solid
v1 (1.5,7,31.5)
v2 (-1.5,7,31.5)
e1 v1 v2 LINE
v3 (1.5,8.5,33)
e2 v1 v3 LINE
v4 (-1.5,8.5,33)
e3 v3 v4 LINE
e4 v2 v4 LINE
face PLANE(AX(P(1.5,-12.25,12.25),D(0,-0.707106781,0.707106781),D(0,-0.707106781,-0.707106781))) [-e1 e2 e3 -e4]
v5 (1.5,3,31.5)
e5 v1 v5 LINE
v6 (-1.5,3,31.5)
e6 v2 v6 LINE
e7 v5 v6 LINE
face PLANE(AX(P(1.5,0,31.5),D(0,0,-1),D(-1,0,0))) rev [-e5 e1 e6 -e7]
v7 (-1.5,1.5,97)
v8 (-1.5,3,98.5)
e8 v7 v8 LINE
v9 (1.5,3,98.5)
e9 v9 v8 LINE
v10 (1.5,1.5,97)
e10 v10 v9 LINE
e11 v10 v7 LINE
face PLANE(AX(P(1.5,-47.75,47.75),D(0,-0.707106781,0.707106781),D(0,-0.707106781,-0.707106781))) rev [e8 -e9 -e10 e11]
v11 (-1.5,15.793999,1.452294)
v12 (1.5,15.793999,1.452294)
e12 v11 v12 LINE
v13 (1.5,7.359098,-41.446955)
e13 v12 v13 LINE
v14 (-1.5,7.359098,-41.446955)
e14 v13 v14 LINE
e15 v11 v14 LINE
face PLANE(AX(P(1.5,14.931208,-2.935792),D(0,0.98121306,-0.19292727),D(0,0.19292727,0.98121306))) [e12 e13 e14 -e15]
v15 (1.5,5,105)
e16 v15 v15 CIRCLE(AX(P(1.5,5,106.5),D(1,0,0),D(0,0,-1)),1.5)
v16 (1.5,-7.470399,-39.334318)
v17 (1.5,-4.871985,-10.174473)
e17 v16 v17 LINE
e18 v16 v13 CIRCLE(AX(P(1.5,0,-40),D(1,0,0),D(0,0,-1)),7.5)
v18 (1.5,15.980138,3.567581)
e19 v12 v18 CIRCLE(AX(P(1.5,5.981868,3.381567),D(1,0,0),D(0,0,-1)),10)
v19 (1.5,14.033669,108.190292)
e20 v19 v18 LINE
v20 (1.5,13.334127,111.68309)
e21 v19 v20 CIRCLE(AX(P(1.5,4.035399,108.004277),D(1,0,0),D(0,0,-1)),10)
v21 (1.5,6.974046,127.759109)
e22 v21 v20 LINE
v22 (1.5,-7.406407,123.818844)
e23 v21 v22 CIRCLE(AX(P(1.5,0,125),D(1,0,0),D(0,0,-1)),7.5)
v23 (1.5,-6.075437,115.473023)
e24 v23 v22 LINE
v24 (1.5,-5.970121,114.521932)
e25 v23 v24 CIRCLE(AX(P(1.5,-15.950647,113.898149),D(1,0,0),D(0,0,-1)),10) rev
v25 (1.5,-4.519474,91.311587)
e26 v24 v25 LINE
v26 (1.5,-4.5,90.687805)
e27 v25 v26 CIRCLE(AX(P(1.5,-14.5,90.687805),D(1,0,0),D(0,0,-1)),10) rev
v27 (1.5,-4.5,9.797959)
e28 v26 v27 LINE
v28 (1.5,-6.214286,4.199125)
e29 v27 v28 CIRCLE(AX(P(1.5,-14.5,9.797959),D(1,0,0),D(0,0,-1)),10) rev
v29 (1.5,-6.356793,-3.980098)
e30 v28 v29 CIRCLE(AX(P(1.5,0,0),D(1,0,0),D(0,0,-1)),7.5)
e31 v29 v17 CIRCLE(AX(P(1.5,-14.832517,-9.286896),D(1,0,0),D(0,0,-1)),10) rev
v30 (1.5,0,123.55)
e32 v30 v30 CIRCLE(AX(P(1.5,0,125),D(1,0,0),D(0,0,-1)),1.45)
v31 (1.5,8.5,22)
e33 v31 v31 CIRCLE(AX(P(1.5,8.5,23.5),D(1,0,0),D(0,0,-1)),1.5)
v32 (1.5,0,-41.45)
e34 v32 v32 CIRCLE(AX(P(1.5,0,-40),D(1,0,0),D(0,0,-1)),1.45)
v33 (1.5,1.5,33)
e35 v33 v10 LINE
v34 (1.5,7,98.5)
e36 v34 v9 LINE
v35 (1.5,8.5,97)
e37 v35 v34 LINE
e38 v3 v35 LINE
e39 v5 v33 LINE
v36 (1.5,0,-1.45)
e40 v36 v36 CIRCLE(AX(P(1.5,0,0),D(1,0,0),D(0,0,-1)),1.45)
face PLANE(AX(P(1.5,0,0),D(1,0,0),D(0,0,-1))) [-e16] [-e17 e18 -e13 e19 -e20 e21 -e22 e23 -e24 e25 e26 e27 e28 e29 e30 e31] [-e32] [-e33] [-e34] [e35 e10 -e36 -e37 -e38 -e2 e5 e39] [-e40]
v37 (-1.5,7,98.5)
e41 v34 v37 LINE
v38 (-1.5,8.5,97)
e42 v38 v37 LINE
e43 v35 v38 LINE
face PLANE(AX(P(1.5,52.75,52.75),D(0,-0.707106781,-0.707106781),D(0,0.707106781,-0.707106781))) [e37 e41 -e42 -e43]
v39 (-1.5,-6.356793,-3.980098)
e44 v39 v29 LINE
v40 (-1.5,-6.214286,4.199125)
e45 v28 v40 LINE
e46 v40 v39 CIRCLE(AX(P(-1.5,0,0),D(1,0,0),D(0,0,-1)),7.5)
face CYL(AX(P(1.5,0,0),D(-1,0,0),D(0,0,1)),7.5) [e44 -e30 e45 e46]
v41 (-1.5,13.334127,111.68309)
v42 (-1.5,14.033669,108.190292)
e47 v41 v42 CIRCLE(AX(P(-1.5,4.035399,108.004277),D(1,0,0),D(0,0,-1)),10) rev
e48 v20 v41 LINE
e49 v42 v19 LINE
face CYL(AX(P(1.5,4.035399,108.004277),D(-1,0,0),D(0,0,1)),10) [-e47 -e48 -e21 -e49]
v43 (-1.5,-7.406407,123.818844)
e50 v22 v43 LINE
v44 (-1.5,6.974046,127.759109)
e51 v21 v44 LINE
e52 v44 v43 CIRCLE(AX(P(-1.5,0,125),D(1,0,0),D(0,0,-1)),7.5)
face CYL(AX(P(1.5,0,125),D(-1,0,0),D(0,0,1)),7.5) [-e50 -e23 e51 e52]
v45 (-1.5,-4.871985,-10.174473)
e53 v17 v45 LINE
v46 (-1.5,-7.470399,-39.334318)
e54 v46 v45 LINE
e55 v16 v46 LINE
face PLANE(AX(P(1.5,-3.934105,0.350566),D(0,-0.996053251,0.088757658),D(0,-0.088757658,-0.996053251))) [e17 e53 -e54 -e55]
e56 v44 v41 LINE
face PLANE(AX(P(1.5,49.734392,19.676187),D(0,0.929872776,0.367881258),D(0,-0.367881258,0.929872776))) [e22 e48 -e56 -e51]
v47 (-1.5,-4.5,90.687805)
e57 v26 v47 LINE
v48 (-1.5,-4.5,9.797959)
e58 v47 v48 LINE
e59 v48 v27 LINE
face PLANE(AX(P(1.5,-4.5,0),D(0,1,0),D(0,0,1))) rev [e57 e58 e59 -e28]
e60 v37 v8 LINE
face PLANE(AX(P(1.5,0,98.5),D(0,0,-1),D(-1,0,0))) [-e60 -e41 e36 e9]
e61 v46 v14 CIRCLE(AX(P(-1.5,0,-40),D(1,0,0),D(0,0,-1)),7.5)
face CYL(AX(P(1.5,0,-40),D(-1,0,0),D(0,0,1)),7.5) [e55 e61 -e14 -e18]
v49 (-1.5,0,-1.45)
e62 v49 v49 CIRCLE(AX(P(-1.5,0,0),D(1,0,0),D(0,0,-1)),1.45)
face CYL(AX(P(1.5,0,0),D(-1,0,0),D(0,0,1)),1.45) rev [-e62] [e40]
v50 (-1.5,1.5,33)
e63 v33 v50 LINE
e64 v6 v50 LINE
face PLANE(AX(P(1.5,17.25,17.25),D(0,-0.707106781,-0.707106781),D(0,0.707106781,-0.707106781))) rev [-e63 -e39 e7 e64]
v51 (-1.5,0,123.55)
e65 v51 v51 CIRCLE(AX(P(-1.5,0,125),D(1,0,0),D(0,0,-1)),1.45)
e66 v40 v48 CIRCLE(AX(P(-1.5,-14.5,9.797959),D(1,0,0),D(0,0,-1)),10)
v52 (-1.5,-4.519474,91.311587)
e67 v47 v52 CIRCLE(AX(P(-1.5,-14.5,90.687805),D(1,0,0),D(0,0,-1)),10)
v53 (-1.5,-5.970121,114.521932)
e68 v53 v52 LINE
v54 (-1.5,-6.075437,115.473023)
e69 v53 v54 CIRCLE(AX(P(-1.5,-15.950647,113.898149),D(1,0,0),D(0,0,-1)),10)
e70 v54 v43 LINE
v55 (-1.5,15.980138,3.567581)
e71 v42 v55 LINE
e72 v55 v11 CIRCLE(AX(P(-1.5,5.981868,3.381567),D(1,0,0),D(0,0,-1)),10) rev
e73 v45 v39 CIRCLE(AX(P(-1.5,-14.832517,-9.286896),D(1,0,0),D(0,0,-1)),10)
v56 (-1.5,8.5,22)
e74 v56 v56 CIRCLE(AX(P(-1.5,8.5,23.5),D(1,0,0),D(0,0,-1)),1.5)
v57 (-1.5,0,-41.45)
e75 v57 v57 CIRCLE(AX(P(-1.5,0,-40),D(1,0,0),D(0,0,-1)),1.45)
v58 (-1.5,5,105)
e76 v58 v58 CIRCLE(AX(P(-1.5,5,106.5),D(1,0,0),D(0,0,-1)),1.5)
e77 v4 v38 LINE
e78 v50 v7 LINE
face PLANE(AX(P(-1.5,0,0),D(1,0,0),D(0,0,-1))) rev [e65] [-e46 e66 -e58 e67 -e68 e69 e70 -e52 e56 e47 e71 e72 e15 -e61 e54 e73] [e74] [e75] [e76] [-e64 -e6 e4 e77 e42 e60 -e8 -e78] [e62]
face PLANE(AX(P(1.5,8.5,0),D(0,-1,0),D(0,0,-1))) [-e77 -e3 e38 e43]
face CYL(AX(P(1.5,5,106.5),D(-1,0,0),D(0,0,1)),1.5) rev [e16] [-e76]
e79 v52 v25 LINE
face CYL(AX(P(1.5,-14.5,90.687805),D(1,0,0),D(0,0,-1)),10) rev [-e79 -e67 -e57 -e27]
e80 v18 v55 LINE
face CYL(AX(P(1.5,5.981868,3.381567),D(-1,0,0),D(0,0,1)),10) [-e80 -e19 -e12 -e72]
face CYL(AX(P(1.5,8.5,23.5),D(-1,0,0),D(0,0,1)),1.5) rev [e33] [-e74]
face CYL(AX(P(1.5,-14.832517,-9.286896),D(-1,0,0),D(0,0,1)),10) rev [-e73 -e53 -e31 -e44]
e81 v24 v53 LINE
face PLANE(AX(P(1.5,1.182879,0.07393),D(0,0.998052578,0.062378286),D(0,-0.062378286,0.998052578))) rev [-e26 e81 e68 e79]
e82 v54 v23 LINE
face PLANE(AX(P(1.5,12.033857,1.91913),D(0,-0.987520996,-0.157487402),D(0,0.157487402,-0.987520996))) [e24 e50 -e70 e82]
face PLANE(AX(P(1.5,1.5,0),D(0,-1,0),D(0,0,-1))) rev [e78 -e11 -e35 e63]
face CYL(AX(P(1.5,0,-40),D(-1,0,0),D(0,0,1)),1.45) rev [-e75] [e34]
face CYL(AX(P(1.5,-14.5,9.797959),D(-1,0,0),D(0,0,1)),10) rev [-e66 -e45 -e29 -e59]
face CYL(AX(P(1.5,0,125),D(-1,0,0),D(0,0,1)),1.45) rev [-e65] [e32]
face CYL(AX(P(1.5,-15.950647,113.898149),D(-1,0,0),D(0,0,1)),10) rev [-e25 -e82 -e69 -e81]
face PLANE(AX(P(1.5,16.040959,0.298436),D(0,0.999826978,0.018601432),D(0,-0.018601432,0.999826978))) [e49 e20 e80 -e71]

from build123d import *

# Parameters (mm, degrees)
SKETCH1_R           = 1.45
SKETCH1_R_2         = 1.5
BOSS_EXTRUDE1_DEPTH = 1.5
FILLET1_R           = 10


with BuildPart() as part:
    # Sketch1 → Boss-Extrude1 (new, symmetric)
    with BuildSketch(Plane(origin=(0, 0, 0), x_dir=(0, 0, -1), z_dir=(1, 0, 0))):
        with BuildLine():
            Line((-110, 14), (-127.759109434, 6.974045822))
            ThreePointArc((-127.759109434, 6.974045822), (-132.233383985, -1.981957648), (-123.818844483, -7.406407472))
            Line((-123.818844483, -7.406407472), (-115, -6))
            Line((-115, -6), (-91, -4.5))
            Line((-91, -4.5), (-6, -4.5))
            ThreePointArc((-6, -4.5), (0, -7.5), (6, -4.5))
            Line((6, -4.5), (39.334317565, -7.47039938))
            ThreePointArc((39.334317565, -7.47039938), (47.425031601, -1.057783404), (41.446954522, 7.359097948))
            Line((41.446954522, 7.359097948), (-2.5, 16))
            Line((-2.5, 16), (-110, 14))
        make_face()
        with Locations((-125, 0)):
            Circle(SKETCH1_R, mode=Mode.SUBTRACT)
        Circle(SKETCH1_R, mode=Mode.SUBTRACT)
        with Locations((-106.5, 5)):
            Circle(SKETCH1_R_2, mode=Mode.SUBTRACT)
        Polygon((-33, 8.5), (-31.5, 7), (-31.5, 3), (-33, 1.5), (-97, 1.5), (-98.5, 3), (-98.5, 7), (-97, 8.5), align=None, mode=Mode.SUBTRACT)
        with Locations((-23.5, 8.5)):
            Circle(SKETCH1_R_2, mode=Mode.SUBTRACT)
        with Locations((40, 0)):
            Circle(SKETCH1_R, mode=Mode.SUBTRACT)
    extrude(amount=BOSS_EXTRUDE1_DEPTH, both=True)

    # Fillet1
    # the kernel refuses this fillet: 10 mm, written as the material it adds along each edge
    with BuildSketch(Plane(origin=(-1.5, -4.5, -6), x_dir=(0, -0.08875765800116116, -0.9960532506578896), z_dir=(1, 0, 0))) as fillet1_piece_1:
        with BuildLine():
            CenterArc((4.191013496, -10), FILLET1_R, 90, 37.143535998)
            ThreePointArc((-1.847125053, -2.028746469), (-0.83000341, -1.099556568), (0, 0))
            Line((0, 0), (4.191013496, 0))
        make_face()
    extrude(amount=3)
    with BuildSketch(Plane(origin=(-1.5, -4.5, 6), x_dir=(0, -0.689479455343069, -0.7243052399781633), z_dir=(1, 0, 0))) as fillet1_piece_2:
        with BuildLine():
            CenterArc((4.143912969, -9.861667083), FILLET1_R, 99.541184992, 34.04773237)
            Line((-2.750881584, -2.618614683), (0, 0))
            ThreePointArc((0, 0), (1.243173891, -0.103749688), (2.486347782, 0))
        make_face()
    extrude(amount=3)
    with BuildSketch(Plane(origin=(-1.5, -4.5, 91), x_dir=(0, 0, -1), z_dir=(1, 0, 0))) as fillet1_piece_3:
        with BuildLine():
            CenterArc((FILLET1_R * 0.0312195418814, -FILLET1_R), FILLET1_R, 90, 3.576334375)
            Line((-FILLET1_R * 0.0311587442738, -FILLET1_R * 0.00194742151711), (0, 0))
            Line((0, 0), (FILLET1_R * 0.0312195418814, 0))
        make_face()
    extrude(amount=3)
    with BuildSketch(Plane(origin=(-1.5, -6, 115), x_dir=(0, 0.06237828615518053, -0.9980525784828885), z_dir=(1, 0, 0))) as fillet1_piece_4:
        with BuildLine():
            CenterArc((FILLET1_R * 0.04790007143, -FILLET1_R), FILLET1_R, 90, 5.484751657)
            Line((-FILLET1_R * 0.0476807691396, -FILLET1_R * 0.00457832909063), (0, 0))
            Line((0, 0), (FILLET1_R * 0.04790007143, 0))
        make_face()
    extrude(amount=3)
    # the kernel refuses this fillet: 10 mm, written as the material it takes off along each edge
    with BuildSketch(Plane(origin=(-6.025054026, 14, 110), x_dir=(0, 0.018601432156142118, -0.9998269783926319), z_dir=(1, 0, 0))) as fillet1_2_piece_1:
        with BuildLine():
            CenterArc((FILLET1_R * 0.181002161022, -FILLET1_R), FILLET1_R, 90, 20.51916315)
            Line((-FILLET1_R * 0.169518480088, -FILLET1_R * 0.0634449935237), (0, 0))
            Line((0, 0), (FILLET1_R * 0.181002161022, 0))
        make_face()
    extrude(amount=12.050108051, mode=Mode.SUBTRACT)
    with BuildSketch(Plane(origin=(4.169414773, 16, 2.5), x_dir=(0, -0.018601432156142392, 0.9998269783926319), z_dir=(-1, 0, 0))) as fillet1_2_piece_2:
        with BuildLine():
            CenterArc((FILLET1_R * 0.106776590902, -FILLET1_R), FILLET1_R, 90, 12.189510847)
            Line((-FILLET1_R * 0.104369266233, -FILLET1_R * 0.0225454348081), (0, 0))
            Line((0, 0), (FILLET1_R * 0.106776590902, 0))
        make_face()
    extrude(amount=8.338829545, mode=Mode.SUBTRACT)


solid = part.part
